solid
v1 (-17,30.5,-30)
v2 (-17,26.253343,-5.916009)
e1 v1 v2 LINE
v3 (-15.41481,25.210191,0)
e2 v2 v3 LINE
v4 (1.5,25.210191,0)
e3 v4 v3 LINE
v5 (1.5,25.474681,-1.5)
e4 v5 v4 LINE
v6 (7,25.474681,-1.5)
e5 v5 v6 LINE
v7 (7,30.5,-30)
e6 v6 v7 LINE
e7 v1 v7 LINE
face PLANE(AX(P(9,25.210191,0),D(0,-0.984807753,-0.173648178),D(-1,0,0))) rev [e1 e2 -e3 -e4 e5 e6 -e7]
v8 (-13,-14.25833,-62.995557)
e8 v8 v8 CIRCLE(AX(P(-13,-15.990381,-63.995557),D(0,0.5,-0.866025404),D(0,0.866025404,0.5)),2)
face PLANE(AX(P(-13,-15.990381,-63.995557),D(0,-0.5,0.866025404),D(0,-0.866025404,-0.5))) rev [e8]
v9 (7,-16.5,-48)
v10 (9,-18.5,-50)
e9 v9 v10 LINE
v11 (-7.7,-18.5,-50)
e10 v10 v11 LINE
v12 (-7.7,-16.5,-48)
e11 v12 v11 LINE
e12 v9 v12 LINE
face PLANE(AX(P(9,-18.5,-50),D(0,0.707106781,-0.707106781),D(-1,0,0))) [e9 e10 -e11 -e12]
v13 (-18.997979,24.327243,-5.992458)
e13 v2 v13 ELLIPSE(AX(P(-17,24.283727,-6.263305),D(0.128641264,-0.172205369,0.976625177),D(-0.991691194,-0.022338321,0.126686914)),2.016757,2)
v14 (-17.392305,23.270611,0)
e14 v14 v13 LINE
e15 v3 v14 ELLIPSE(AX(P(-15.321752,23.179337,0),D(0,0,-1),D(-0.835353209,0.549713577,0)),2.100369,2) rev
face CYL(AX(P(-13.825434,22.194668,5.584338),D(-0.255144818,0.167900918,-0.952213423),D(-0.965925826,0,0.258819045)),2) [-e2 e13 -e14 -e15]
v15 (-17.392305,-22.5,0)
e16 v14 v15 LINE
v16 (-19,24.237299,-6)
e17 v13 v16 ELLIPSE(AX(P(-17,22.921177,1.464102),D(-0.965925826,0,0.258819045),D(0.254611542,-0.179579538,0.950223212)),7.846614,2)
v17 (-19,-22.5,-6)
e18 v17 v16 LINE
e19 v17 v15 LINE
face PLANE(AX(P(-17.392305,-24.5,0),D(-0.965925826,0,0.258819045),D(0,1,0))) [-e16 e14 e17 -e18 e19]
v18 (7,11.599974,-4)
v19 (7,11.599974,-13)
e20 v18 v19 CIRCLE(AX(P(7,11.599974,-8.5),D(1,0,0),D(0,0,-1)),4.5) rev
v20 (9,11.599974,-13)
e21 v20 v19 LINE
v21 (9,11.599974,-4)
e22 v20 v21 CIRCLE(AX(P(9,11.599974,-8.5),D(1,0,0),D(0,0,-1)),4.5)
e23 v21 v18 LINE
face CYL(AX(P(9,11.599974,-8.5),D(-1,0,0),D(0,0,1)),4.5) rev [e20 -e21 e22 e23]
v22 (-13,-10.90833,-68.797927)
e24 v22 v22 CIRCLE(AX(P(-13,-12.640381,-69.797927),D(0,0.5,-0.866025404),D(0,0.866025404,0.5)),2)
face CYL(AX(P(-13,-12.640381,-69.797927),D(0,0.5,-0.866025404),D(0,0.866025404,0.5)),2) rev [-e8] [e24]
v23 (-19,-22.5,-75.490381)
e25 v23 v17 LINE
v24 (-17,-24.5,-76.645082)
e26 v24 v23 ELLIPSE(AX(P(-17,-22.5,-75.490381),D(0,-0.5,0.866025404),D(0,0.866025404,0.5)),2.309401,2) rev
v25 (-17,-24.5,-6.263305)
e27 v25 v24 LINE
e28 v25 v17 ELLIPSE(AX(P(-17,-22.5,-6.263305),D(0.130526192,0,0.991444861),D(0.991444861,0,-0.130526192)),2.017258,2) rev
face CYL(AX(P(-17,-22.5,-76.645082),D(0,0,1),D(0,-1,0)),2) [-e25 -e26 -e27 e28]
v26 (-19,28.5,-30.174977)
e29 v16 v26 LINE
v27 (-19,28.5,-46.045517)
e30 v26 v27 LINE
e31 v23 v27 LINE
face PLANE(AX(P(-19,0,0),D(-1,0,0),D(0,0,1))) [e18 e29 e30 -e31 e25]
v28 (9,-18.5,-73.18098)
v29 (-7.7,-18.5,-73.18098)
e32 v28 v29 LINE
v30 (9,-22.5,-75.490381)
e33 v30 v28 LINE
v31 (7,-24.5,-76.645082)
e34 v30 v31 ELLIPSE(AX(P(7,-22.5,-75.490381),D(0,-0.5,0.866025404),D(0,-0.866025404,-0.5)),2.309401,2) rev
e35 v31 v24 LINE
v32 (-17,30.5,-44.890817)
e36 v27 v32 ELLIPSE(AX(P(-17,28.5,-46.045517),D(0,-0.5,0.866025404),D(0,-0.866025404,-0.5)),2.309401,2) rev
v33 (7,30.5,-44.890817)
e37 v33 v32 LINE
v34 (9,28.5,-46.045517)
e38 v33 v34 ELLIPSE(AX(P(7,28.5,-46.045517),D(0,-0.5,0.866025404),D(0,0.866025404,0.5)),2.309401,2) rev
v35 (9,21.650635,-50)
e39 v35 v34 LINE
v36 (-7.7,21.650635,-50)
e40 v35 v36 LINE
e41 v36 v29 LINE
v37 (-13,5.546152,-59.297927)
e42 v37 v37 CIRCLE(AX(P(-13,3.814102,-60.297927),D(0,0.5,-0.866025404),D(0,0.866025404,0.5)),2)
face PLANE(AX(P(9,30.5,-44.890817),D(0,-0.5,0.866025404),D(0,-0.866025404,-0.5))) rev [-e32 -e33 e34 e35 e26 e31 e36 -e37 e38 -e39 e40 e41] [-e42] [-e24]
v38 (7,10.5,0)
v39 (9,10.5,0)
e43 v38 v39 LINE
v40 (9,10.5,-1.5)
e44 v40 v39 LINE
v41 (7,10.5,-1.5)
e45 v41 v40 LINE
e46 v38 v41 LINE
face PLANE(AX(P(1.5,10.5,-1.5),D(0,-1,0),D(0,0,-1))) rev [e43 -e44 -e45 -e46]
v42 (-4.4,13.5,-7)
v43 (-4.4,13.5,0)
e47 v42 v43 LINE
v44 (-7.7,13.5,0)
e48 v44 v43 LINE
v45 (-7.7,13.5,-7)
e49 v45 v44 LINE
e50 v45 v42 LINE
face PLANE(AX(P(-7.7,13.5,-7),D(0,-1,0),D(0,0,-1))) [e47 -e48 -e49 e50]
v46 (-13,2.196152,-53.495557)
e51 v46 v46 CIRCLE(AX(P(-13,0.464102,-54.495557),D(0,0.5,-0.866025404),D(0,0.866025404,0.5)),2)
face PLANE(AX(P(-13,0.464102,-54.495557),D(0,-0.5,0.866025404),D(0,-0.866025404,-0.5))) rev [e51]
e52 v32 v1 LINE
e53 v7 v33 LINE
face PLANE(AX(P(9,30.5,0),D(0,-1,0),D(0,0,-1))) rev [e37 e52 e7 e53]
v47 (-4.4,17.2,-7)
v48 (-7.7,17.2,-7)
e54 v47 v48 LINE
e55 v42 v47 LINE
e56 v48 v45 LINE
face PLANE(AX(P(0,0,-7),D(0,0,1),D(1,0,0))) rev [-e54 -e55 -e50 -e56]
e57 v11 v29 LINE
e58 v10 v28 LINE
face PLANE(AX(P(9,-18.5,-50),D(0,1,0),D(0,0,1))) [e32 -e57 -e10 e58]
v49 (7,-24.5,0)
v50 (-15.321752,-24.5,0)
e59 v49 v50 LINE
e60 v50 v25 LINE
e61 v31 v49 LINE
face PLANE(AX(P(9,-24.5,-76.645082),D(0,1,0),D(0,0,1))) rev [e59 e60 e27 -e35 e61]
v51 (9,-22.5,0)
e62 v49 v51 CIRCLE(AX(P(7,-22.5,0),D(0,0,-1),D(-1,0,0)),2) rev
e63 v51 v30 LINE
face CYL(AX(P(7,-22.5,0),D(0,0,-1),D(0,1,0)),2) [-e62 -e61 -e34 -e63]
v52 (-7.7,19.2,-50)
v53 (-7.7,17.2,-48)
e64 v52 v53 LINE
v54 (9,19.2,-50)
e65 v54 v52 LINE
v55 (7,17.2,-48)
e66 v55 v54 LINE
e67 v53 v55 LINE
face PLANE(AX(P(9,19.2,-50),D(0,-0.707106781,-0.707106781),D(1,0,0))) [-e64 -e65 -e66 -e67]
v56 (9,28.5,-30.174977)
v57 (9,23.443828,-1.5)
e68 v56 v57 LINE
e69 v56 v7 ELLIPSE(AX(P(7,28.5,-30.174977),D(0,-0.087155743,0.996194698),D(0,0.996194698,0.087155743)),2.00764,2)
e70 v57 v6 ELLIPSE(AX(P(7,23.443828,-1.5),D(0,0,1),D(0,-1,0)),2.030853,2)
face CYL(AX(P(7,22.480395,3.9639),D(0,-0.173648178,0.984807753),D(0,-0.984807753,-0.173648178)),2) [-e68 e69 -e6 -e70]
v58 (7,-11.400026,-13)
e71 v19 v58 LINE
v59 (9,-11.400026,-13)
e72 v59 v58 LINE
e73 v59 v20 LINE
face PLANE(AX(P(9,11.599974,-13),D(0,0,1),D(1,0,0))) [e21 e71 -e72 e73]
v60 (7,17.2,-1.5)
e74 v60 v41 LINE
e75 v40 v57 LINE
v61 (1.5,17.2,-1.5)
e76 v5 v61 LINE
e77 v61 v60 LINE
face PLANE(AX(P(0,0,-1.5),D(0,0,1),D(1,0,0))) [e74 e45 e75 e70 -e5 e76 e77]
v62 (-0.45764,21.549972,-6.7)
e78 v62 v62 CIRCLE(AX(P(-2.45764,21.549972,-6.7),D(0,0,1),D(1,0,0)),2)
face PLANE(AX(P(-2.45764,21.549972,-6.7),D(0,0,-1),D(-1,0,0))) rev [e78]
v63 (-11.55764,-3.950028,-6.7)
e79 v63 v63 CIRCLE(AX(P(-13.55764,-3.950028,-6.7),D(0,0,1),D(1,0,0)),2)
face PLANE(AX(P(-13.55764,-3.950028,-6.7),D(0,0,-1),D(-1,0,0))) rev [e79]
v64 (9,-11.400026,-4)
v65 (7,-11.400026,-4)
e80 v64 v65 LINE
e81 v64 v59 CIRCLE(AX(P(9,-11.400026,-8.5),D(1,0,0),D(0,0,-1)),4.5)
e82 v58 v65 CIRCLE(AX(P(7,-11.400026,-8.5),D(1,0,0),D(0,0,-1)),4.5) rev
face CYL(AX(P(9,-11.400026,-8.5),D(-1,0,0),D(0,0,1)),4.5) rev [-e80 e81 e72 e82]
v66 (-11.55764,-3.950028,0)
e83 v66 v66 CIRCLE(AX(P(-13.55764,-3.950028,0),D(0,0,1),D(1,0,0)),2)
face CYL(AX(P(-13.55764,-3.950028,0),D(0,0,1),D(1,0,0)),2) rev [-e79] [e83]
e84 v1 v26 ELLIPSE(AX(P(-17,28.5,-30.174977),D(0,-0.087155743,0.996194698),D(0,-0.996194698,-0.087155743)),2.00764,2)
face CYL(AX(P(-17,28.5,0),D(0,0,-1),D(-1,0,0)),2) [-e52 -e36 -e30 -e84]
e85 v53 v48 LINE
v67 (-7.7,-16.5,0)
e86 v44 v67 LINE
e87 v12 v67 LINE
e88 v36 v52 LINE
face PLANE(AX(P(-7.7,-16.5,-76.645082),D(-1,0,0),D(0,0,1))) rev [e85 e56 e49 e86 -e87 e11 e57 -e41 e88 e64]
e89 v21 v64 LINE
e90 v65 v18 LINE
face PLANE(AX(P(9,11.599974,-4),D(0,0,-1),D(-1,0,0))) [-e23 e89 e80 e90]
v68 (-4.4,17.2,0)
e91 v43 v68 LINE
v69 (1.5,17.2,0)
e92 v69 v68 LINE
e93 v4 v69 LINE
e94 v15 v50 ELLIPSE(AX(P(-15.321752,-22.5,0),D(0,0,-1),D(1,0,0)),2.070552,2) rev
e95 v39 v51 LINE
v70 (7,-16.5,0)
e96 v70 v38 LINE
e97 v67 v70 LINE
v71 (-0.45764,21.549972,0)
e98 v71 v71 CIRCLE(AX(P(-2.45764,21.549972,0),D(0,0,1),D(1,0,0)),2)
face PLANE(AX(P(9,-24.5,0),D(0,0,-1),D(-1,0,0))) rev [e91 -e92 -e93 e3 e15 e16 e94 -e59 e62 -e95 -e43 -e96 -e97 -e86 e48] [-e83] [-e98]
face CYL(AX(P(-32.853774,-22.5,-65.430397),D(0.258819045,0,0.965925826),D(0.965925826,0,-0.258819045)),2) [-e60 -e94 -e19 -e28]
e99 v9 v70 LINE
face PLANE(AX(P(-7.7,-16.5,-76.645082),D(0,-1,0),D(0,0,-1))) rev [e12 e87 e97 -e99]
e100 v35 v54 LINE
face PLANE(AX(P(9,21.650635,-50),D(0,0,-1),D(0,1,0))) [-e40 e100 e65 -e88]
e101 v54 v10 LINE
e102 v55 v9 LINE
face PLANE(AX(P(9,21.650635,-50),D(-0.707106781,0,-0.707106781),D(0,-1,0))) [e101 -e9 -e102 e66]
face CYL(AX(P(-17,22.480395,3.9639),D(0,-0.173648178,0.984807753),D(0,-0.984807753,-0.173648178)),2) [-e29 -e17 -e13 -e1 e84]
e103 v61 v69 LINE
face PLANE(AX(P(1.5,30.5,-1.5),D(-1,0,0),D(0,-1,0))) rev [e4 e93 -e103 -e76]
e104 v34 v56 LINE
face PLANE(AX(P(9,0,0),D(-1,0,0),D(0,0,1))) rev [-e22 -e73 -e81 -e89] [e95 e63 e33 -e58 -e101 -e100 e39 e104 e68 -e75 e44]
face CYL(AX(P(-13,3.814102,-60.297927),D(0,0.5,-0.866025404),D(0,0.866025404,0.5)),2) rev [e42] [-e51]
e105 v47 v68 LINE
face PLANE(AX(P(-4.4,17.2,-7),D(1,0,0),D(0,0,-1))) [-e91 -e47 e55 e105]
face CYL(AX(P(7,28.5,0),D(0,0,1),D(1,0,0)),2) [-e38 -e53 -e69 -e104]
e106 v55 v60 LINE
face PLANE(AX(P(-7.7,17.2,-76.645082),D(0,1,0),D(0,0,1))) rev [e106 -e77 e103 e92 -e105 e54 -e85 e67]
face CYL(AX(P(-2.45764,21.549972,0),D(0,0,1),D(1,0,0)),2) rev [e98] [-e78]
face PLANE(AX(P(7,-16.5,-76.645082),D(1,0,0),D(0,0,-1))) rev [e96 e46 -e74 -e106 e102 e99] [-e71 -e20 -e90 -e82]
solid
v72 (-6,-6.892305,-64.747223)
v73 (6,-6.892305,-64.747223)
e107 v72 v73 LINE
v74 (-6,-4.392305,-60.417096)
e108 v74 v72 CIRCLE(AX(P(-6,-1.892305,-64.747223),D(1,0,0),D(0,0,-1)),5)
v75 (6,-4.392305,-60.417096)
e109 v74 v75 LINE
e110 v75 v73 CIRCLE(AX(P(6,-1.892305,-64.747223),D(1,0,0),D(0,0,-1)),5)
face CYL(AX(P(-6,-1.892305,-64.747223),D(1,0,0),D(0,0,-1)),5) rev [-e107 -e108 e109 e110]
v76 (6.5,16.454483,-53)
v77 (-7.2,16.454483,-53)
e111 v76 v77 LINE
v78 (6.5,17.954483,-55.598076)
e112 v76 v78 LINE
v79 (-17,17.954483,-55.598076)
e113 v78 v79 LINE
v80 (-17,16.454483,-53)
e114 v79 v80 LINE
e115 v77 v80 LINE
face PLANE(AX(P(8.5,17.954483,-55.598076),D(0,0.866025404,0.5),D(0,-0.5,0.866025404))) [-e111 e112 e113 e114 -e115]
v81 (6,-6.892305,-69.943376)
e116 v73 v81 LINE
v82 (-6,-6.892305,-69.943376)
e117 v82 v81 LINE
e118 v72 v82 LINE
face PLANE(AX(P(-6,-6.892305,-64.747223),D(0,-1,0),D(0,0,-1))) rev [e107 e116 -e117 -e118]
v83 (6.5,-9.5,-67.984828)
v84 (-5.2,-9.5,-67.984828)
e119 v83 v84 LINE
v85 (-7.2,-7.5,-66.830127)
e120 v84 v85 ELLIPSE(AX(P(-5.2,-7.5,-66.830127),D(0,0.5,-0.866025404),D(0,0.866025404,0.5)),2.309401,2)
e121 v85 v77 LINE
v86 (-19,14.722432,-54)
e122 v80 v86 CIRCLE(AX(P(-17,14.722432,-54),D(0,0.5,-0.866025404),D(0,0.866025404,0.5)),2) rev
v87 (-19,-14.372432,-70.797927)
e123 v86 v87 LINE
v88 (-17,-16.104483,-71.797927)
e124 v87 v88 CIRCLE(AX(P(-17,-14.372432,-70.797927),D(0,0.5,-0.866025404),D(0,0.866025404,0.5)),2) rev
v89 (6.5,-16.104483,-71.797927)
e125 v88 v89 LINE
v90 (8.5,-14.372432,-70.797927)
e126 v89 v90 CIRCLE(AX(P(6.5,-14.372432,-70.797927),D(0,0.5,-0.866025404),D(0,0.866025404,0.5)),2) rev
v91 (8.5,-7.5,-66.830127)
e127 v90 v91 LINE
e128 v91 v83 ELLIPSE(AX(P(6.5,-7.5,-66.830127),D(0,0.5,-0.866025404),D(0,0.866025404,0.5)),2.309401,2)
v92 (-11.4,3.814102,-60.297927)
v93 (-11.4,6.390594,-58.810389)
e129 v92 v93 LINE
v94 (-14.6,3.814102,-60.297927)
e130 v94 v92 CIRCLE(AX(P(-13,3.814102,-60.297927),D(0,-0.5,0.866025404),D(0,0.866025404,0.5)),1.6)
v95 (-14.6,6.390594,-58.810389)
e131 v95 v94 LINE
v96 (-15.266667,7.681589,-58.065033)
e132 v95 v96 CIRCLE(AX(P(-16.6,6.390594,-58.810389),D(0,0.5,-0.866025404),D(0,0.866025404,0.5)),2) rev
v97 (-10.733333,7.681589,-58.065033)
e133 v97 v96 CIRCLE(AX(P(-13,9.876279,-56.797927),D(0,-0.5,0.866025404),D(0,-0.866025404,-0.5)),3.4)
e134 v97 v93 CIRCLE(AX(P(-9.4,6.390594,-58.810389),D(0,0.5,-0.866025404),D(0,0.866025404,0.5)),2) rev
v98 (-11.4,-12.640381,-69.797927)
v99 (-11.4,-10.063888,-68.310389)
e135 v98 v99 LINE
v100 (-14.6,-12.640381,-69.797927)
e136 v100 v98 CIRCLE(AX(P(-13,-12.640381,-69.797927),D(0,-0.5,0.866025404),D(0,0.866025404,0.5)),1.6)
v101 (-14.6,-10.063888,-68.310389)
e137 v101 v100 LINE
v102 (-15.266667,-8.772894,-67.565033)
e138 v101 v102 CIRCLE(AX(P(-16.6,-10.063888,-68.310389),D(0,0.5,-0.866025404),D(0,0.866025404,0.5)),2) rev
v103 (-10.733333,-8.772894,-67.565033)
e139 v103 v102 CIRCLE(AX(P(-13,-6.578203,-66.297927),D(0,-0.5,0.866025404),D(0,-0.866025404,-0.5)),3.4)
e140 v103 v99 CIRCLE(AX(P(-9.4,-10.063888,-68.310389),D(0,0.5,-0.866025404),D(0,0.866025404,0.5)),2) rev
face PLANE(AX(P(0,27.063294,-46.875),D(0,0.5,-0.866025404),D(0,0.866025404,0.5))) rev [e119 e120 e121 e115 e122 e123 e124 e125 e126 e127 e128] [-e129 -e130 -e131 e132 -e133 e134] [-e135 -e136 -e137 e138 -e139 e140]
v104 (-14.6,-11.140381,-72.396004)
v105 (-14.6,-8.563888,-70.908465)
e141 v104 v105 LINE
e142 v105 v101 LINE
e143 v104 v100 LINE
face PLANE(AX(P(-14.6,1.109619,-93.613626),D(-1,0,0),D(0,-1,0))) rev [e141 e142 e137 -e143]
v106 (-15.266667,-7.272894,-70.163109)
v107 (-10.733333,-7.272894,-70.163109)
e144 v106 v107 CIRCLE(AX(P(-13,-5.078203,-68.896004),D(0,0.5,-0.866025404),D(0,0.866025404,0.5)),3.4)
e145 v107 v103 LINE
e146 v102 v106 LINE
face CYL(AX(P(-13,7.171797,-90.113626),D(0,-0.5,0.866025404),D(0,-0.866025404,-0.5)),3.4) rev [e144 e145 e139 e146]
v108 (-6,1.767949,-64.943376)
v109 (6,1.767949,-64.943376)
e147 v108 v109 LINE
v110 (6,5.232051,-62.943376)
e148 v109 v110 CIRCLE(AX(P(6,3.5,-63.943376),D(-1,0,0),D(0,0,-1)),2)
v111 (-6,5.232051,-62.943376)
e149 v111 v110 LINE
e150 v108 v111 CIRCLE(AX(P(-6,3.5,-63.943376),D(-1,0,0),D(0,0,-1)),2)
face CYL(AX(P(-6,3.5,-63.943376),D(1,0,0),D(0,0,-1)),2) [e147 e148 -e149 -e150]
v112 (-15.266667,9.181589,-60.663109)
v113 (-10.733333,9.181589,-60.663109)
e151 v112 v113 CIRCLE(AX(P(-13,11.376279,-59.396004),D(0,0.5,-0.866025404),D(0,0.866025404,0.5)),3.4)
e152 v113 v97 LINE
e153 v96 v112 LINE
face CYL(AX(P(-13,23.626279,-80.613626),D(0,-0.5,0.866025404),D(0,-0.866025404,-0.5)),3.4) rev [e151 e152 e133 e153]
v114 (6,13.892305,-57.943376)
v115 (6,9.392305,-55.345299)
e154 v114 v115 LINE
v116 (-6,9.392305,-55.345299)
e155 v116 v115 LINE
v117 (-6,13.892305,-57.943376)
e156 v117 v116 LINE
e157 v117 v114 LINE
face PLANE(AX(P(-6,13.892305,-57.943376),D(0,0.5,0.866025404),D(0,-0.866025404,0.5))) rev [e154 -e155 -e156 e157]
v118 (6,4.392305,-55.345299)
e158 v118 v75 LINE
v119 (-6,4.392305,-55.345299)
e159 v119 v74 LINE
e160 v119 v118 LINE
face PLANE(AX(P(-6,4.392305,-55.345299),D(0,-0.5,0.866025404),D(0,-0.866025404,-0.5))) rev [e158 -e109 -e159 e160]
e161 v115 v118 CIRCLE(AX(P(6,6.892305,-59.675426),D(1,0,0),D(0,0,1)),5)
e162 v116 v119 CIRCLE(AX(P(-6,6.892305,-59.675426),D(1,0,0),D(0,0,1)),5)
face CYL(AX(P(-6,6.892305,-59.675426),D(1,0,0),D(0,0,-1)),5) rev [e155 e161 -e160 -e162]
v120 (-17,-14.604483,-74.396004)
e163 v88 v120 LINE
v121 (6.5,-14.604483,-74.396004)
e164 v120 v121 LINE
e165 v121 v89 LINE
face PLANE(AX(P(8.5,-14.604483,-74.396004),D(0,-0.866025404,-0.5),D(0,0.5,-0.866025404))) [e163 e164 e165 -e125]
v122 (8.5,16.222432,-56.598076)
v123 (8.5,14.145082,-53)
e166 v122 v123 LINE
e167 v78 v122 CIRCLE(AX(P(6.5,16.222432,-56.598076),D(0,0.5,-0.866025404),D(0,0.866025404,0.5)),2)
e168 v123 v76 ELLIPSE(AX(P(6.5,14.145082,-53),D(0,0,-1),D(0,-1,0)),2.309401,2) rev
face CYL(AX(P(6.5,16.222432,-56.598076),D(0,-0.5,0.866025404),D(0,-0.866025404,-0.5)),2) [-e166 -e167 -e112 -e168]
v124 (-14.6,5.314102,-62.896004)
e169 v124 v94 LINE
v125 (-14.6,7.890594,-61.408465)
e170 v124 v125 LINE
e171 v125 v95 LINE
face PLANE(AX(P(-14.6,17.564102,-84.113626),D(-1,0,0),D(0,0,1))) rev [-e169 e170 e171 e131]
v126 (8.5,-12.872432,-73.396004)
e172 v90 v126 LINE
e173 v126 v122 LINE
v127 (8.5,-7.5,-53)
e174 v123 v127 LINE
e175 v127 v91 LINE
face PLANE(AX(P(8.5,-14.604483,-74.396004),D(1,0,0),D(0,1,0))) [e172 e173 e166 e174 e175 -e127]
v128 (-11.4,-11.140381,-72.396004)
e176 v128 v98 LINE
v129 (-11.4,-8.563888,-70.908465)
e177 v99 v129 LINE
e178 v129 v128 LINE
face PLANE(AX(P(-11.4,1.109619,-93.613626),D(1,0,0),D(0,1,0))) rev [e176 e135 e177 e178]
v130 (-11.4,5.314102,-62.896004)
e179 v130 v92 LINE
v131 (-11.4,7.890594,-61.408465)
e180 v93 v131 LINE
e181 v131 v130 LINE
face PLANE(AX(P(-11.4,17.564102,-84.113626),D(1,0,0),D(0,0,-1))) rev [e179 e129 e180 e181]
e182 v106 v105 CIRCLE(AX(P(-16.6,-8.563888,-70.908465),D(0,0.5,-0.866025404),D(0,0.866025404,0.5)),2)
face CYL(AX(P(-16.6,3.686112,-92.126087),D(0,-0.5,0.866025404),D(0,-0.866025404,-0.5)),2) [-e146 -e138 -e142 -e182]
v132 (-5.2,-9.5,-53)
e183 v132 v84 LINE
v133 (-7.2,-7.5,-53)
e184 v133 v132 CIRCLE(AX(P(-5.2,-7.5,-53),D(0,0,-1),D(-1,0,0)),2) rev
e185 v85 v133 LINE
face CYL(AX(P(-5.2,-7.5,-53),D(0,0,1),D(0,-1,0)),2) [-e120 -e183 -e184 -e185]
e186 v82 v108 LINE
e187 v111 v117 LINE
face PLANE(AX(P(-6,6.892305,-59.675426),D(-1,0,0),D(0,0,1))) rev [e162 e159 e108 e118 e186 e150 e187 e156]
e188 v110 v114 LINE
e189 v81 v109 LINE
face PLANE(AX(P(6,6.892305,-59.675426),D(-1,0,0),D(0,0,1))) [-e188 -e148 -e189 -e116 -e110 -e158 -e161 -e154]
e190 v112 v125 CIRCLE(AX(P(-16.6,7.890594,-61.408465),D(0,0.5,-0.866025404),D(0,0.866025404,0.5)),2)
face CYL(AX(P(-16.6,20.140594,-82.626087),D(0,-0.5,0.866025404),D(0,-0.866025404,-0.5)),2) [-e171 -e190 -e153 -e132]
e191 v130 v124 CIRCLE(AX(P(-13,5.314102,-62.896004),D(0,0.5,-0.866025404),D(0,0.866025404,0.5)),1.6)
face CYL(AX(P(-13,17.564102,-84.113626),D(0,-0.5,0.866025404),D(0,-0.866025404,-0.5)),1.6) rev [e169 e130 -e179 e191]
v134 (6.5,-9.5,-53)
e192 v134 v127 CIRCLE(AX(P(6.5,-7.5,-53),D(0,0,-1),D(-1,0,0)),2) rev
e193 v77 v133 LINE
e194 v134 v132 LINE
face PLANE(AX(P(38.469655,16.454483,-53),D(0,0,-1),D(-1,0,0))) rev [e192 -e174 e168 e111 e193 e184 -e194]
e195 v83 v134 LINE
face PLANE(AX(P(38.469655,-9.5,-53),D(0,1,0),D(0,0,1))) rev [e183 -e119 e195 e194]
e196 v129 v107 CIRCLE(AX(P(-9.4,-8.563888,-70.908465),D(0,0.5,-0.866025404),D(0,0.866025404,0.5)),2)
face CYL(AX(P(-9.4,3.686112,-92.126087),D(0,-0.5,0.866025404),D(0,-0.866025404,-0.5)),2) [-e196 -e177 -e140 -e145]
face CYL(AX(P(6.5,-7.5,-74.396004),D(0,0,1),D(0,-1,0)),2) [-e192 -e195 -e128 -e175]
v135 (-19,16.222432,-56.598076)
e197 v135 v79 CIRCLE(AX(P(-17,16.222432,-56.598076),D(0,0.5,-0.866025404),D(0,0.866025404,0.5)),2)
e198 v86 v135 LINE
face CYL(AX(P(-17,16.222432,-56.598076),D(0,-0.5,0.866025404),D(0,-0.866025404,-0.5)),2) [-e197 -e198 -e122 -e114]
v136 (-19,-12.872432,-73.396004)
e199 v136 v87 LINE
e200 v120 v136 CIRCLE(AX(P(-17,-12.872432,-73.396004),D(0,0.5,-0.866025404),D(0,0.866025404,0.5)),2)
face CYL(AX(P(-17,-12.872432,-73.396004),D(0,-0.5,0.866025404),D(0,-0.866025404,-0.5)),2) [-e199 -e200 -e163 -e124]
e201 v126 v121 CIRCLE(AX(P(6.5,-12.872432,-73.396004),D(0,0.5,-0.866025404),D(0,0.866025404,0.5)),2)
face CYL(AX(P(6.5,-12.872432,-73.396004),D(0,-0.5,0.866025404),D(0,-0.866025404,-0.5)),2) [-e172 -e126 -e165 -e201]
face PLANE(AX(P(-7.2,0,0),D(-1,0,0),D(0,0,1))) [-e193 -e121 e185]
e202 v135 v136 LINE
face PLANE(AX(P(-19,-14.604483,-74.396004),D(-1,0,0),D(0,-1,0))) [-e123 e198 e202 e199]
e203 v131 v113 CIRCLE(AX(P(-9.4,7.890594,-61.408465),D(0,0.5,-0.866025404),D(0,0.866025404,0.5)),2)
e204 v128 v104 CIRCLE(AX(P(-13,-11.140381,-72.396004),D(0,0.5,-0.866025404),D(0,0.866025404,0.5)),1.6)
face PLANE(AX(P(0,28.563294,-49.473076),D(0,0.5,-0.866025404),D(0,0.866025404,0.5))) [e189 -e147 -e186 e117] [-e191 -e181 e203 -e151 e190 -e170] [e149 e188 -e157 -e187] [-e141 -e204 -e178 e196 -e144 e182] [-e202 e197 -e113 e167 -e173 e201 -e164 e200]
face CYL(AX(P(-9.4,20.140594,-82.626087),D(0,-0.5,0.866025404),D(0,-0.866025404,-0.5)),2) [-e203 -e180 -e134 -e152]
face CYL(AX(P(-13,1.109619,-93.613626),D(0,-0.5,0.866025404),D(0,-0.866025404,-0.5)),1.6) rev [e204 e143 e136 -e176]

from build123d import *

# Parameters (mm, degrees)
CORPS_DEPTH                           = 9
CORPS_DEPTH_BACK                      = 19
ESQUISSE3_W                           = 14.7
ESQUISSE3_H                           = 33.7
CAVITE_BATTERIE_DEPTH                 = 85.650567232
DIAM_TRE_DU_PER_AGE_4_0_4_1_D         = 4
DIAM_TRE_DU_PER_AGE_4_0_4_1_DEPTH     = 6.7
DIAM_TRE_DU_PER_AGE_4_0_4_2_D         = 4
DIAM_TRE_DU_PER_AGE_4_0_4_2_DEPTH     = 6.7
ESQUISSE8_W                           = 26.645081595
ESQUISSE8_H                           = 40.150635095
DEGAGEMENT_TRAPPE_ET_CONNECTEUR_DEPTH = 85.164176065
CHANFREIN1_SIZE                       = 2
ESQUISSE9_W                           = 3.3
ESQUISSE9_H                           = 3.7
DETROMPEUR_BATTERIE_DEPTH             = 7
CHANFREIN2_SIZE                       = 30
CHANFREIN2_SIZE2                      = 5.289809421
CHANFREIN3_SIZE                       = 6
CHANFREIN3_SIZE2                      = 1.607695155
ESQUISSE10_W                          = 7.5
ESQUISSE10_H                          = 20
DEGAGEMENT_PIN_INTERRUPTEUR_DEPTH     = 1.5
CONG_2_R                              = 2
ESQUISSE11_W                          = 37.595854812
ESQUISSE11_H                          = 27.5
CORPS_BUTEE_1_DEPTH                   = 3
CORPS_BUTEE_2_START                   = 0.5
CORPS_BUTEE_2_DEPTH                   = 15.7
ACCROCHE_TRAPPE_DEPTH                 = 6
TROU_DE_SERRURE_DEPTH                 = 73.229072398
CONG_1_R                              = 2


with BuildPart() as part:
    # Esquisse2 → corps (new, two sides: drawn at the far end of the back side and taken through both)
    with BuildSketch(Plane(origin=(0, 0, 0), x_dir=(0, 0, -1), z_dir=(1, 0, 0)).offset(-CORPS_DEPTH_BACK)):
        Polygon((0, -24.5), (0, 30.5), (44.89081679, 30.5), (76.645081595, -24.5), align=None)
    extrude(amount=CORPS_DEPTH + CORPS_DEPTH_BACK)

    # Esquisse3 → cavite_batterie (cut, through all)
    with BuildSketch(Plane.XY):
        with Locations((-0.35, 0.35)):
            Rectangle(ESQUISSE3_W, ESQUISSE3_H)
    extrude(amount=-CAVITE_BATTERIE_DEPTH, mode=Mode.SUBTRACT)

    # Diamètre du perçage Ø4.0 (4)1
    with Locations(Plane.XY):
        with Locations((-2.45764, 21.549972456), (-13.55764, -3.950027544)):
            Hole(DIAM_TRE_DU_PER_AGE_4_0_4_1_D / 2, depth=DIAM_TRE_DU_PER_AGE_4_0_4_1_DEPTH)

    # Diamètre du perçage Ø4.0 (4)2
    with Locations(Plane(origin=(0, 27.063293868, -46.875), x_dir=(-1, 0, 0), z_dir=(0, 0.49999999999999806, -0.8660254037844397))):
        with Locations((13, -26.845854812), (13, -45.845854812)):
            Hole(DIAM_TRE_DU_PER_AGE_4_0_4_2_D / 2, depth=DIAM_TRE_DU_PER_AGE_4_0_4_2_DEPTH)

    # Esquisse8 → degagement_trappe et connecteur (cut, through all)
    with BuildSketch(Plane(origin=(-7.7, 0, 0), x_dir=(0, 0, -1), z_dir=(1, 0, 0))):
        with Locations((63.322540798, 1.575317548)):
            Rectangle(ESQUISSE8_W, ESQUISSE8_H)
        with BuildLine():
            Line((13, 11.599974456), (13, -11.400025544))
            ThreePointArc((13, -11.400025544), (8.5, -15.900025544), (4, -11.400025544))
            Line((4, -11.400025544), (4, 11.599974456))
            ThreePointArc((4, 11.599974456), (8.5, 16.099974456), (13, 11.599974456))
        make_face()
    extrude(amount=DEGAGEMENT_TRAPPE_ET_CONNECTEUR_DEPTH, mode=Mode.SUBTRACT)

    # Chanfrein1
    chanfrein1_edges = [part.edges().sort_by_distance(p)[0] for p in [
        (-0.35, 17.2, -50),
        (-0.35, -16.5, -50),
        (7, 0.35, -50),
    ]]
    chamfer(chanfrein1_edges, length=CHANFREIN1_SIZE - 0.0001)  # a hair under: the kernel refuses the full size

    # Esquisse9 → detrompeur_batterie (add)
    with BuildSketch(Plane.XY):
        with Locations((-6.05, 15.35)):
            Rectangle(ESQUISSE9_W, ESQUISSE9_H)
    extrude(amount=-DETROMPEUR_BATTERIE_DEPTH)

    # Chanfrein2
    chanfrein2_edges = [part.edges().sort_by_distance(p)[0] for p in [
        (-5, 30.5, 0),
    ]]
    chanfrein2_side = [part.faces().sort_by_distance(p)[0] for p in [
        (-5, 30.5, -22.445408395),
    ]]
    chamfer(chanfrein2_edges, length=CHANFREIN2_SIZE, length2=CHANFREIN2_SIZE2, reference=chanfrein2_side[0])

    # Chanfrein3
    chanfrein3_edges = [part.edges().sort_by_distance(p)[0] for p in [
        (-19, 0.355095289, 0),
    ]]
    chanfrein3_side = [part.faces().sort_by_distance(p)[0] for p in [
        (-19, -0.079128224, -31.587868667),
    ]]
    chamfer(chanfrein3_edges, length=CHANFREIN3_SIZE, length2=CHANFREIN3_SIZE2, reference=chanfrein3_side[0])

    # Esquisse10 → degagement_pin_interrupteur (cut)
    with BuildSketch(Plane.XY):
        with Locations((5.25, 20.5)):
            Rectangle(ESQUISSE10_W, ESQUISSE10_H)
    extrude(amount=-DEGAGEMENT_PIN_INTERRUPTEUR_DEPTH, mode=Mode.SUBTRACT)

    # Congé2
    cong_2_edges = [part.edges().sort_by_distance(p)[0] for p in [
        (-19, 30.5, -37.445408395),
        (9, 30.5, -37.445408395),
        (9, 27.987340525, -15.75),
        (-19, -24.5, -41.322540798),
        (-18.196152423, -24.5, -3),
        (-19, 28.384076231, -18),
        (-18.196152423, 25.739171521, -3),
        (9, -24.5, -38.322540798),
    ]]
    fillet(cong_2_edges, radius=CONG_2_R)


with BuildPart() as body_2:
    # Esquisse11 → corps_butee_1 (new body)
    with BuildSketch(Plane(origin=(0, 27.063293868, -46.875), x_dir=(0, -0.8660254037844398, -0.499999999999998), z_dir=(0, -0.49999999999999806, 0.8660254037844399))):
        with Locations((31.047927406, -5.25)):
            Rectangle(ESQUISSE11_W, ESQUISSE11_H)
    extrude(amount=-CORPS_BUTEE_1_DEPTH)

    # Esquisse12 → corps_butee_2 (add)
    with BuildSketch(Plane(origin=(-7.7, 0, 0), x_dir=(0, 0, -1), z_dir=(1, 0, 0)).offset(CORPS_BUTEE_2_START)):
        Polygon((53, 16.454482672), (53, -9.5), (67.984827557, -9.5), align=None)
    extrude(amount=CORPS_BUTEE_2_DEPTH)

    # Esquisse14 → accroche_trappe (cut, symmetric)
    with BuildSketch(Plane(origin=(0, 0, 0), x_dir=(0, 0, -1), z_dir=(1, 0, 0))):
        with BuildLine():
            Line((55.345299462, 4.392304845), (60.417096231, -4.392304845))
            ThreePointArc((60.417096231, -4.392304845), (62.24722325, -6.222431864), (64.74722325, -6.892304845))
            Line((64.74722325, -6.892304845), (69.943375673, -6.892304845))
            Line((69.943375673, -6.892304845), (64.943375673, 1.767949192))
            ThreePointArc((64.943375673, 1.767949192), (62.211324865, 2.5), (62.943375673, 5.232050808))
            Line((62.943375673, 5.232050808), (57.943375673, 13.892304845))
            Line((57.943375673, 13.892304845), (55.345299462, 9.392304845))
            ThreePointArc((55.345299462, 9.392304845), (54.675426481, 6.892304845), (55.345299462, 4.392304845))
        make_face()
    extrude(amount=ACCROCHE_TRAPPE_DEPTH, both=True, mode=Mode.SUBTRACT)

    # Esquisse13 → trou_de_serrure (cut, through all)
    with BuildSketch(Plane(origin=(0, 27.063293868, -46.875), x_dir=(0, -0.8660254037844398, -0.499999999999998), z_dir=(0, -0.49999999999999806, 0.8660254037844399))):
        with BuildLine():
            Line((45.845854812, -11.4), (41.845854812, -11.4))
            ThreePointArc((41.845854812, -11.4), (35.445854812, -13), (41.845854812, -14.6))
            Line((41.845854812, -14.6), (45.845854812, -14.6))
            ThreePointArc((45.845854812, -14.6), (47.445854812, -13), (45.845854812, -11.4))
        make_face()
        with BuildLine():
            Line((26.845854812, -11.4), (22.845854812, -11.4))
            ThreePointArc((22.845854812, -11.4), (16.445854812, -13), (22.845854812, -14.6))
            Line((22.845854812, -14.6), (26.845854812, -14.6))
            ThreePointArc((26.845854812, -14.6), (28.445854812, -13), (26.845854812, -11.4))
        make_face()
    extrude(amount=-TROU_DE_SERRURE_DEPTH, mode=Mode.SUBTRACT)

    # Congé1
    cong_1_edges = [body_2.edges().sort_by_distance(p)[0] for p in [
        (-7.2, -9.5, -60.492413779),
        (8.5, -9.5, -60.492413779),
        (-14.6, -8.426279442, -69.096965511),
        (-11.4, -8.426279442, -69.096965511),
        (-14.6, 8.02820323, -59.596965511),
        (-11.4, 8.02820323, -59.596965511),
        (-19, -15.354482672, -73.096965511),
        (-19, 17.204482672, -54.299038106),
        (8.5, 17.204482672, -54.299038106),
        (8.5, -15.354482672, -73.096965511),
    ]]
    fillet(cong_1_edges, radius=CONG_1_R)


solid = Compound([part.part, body_2.part])
